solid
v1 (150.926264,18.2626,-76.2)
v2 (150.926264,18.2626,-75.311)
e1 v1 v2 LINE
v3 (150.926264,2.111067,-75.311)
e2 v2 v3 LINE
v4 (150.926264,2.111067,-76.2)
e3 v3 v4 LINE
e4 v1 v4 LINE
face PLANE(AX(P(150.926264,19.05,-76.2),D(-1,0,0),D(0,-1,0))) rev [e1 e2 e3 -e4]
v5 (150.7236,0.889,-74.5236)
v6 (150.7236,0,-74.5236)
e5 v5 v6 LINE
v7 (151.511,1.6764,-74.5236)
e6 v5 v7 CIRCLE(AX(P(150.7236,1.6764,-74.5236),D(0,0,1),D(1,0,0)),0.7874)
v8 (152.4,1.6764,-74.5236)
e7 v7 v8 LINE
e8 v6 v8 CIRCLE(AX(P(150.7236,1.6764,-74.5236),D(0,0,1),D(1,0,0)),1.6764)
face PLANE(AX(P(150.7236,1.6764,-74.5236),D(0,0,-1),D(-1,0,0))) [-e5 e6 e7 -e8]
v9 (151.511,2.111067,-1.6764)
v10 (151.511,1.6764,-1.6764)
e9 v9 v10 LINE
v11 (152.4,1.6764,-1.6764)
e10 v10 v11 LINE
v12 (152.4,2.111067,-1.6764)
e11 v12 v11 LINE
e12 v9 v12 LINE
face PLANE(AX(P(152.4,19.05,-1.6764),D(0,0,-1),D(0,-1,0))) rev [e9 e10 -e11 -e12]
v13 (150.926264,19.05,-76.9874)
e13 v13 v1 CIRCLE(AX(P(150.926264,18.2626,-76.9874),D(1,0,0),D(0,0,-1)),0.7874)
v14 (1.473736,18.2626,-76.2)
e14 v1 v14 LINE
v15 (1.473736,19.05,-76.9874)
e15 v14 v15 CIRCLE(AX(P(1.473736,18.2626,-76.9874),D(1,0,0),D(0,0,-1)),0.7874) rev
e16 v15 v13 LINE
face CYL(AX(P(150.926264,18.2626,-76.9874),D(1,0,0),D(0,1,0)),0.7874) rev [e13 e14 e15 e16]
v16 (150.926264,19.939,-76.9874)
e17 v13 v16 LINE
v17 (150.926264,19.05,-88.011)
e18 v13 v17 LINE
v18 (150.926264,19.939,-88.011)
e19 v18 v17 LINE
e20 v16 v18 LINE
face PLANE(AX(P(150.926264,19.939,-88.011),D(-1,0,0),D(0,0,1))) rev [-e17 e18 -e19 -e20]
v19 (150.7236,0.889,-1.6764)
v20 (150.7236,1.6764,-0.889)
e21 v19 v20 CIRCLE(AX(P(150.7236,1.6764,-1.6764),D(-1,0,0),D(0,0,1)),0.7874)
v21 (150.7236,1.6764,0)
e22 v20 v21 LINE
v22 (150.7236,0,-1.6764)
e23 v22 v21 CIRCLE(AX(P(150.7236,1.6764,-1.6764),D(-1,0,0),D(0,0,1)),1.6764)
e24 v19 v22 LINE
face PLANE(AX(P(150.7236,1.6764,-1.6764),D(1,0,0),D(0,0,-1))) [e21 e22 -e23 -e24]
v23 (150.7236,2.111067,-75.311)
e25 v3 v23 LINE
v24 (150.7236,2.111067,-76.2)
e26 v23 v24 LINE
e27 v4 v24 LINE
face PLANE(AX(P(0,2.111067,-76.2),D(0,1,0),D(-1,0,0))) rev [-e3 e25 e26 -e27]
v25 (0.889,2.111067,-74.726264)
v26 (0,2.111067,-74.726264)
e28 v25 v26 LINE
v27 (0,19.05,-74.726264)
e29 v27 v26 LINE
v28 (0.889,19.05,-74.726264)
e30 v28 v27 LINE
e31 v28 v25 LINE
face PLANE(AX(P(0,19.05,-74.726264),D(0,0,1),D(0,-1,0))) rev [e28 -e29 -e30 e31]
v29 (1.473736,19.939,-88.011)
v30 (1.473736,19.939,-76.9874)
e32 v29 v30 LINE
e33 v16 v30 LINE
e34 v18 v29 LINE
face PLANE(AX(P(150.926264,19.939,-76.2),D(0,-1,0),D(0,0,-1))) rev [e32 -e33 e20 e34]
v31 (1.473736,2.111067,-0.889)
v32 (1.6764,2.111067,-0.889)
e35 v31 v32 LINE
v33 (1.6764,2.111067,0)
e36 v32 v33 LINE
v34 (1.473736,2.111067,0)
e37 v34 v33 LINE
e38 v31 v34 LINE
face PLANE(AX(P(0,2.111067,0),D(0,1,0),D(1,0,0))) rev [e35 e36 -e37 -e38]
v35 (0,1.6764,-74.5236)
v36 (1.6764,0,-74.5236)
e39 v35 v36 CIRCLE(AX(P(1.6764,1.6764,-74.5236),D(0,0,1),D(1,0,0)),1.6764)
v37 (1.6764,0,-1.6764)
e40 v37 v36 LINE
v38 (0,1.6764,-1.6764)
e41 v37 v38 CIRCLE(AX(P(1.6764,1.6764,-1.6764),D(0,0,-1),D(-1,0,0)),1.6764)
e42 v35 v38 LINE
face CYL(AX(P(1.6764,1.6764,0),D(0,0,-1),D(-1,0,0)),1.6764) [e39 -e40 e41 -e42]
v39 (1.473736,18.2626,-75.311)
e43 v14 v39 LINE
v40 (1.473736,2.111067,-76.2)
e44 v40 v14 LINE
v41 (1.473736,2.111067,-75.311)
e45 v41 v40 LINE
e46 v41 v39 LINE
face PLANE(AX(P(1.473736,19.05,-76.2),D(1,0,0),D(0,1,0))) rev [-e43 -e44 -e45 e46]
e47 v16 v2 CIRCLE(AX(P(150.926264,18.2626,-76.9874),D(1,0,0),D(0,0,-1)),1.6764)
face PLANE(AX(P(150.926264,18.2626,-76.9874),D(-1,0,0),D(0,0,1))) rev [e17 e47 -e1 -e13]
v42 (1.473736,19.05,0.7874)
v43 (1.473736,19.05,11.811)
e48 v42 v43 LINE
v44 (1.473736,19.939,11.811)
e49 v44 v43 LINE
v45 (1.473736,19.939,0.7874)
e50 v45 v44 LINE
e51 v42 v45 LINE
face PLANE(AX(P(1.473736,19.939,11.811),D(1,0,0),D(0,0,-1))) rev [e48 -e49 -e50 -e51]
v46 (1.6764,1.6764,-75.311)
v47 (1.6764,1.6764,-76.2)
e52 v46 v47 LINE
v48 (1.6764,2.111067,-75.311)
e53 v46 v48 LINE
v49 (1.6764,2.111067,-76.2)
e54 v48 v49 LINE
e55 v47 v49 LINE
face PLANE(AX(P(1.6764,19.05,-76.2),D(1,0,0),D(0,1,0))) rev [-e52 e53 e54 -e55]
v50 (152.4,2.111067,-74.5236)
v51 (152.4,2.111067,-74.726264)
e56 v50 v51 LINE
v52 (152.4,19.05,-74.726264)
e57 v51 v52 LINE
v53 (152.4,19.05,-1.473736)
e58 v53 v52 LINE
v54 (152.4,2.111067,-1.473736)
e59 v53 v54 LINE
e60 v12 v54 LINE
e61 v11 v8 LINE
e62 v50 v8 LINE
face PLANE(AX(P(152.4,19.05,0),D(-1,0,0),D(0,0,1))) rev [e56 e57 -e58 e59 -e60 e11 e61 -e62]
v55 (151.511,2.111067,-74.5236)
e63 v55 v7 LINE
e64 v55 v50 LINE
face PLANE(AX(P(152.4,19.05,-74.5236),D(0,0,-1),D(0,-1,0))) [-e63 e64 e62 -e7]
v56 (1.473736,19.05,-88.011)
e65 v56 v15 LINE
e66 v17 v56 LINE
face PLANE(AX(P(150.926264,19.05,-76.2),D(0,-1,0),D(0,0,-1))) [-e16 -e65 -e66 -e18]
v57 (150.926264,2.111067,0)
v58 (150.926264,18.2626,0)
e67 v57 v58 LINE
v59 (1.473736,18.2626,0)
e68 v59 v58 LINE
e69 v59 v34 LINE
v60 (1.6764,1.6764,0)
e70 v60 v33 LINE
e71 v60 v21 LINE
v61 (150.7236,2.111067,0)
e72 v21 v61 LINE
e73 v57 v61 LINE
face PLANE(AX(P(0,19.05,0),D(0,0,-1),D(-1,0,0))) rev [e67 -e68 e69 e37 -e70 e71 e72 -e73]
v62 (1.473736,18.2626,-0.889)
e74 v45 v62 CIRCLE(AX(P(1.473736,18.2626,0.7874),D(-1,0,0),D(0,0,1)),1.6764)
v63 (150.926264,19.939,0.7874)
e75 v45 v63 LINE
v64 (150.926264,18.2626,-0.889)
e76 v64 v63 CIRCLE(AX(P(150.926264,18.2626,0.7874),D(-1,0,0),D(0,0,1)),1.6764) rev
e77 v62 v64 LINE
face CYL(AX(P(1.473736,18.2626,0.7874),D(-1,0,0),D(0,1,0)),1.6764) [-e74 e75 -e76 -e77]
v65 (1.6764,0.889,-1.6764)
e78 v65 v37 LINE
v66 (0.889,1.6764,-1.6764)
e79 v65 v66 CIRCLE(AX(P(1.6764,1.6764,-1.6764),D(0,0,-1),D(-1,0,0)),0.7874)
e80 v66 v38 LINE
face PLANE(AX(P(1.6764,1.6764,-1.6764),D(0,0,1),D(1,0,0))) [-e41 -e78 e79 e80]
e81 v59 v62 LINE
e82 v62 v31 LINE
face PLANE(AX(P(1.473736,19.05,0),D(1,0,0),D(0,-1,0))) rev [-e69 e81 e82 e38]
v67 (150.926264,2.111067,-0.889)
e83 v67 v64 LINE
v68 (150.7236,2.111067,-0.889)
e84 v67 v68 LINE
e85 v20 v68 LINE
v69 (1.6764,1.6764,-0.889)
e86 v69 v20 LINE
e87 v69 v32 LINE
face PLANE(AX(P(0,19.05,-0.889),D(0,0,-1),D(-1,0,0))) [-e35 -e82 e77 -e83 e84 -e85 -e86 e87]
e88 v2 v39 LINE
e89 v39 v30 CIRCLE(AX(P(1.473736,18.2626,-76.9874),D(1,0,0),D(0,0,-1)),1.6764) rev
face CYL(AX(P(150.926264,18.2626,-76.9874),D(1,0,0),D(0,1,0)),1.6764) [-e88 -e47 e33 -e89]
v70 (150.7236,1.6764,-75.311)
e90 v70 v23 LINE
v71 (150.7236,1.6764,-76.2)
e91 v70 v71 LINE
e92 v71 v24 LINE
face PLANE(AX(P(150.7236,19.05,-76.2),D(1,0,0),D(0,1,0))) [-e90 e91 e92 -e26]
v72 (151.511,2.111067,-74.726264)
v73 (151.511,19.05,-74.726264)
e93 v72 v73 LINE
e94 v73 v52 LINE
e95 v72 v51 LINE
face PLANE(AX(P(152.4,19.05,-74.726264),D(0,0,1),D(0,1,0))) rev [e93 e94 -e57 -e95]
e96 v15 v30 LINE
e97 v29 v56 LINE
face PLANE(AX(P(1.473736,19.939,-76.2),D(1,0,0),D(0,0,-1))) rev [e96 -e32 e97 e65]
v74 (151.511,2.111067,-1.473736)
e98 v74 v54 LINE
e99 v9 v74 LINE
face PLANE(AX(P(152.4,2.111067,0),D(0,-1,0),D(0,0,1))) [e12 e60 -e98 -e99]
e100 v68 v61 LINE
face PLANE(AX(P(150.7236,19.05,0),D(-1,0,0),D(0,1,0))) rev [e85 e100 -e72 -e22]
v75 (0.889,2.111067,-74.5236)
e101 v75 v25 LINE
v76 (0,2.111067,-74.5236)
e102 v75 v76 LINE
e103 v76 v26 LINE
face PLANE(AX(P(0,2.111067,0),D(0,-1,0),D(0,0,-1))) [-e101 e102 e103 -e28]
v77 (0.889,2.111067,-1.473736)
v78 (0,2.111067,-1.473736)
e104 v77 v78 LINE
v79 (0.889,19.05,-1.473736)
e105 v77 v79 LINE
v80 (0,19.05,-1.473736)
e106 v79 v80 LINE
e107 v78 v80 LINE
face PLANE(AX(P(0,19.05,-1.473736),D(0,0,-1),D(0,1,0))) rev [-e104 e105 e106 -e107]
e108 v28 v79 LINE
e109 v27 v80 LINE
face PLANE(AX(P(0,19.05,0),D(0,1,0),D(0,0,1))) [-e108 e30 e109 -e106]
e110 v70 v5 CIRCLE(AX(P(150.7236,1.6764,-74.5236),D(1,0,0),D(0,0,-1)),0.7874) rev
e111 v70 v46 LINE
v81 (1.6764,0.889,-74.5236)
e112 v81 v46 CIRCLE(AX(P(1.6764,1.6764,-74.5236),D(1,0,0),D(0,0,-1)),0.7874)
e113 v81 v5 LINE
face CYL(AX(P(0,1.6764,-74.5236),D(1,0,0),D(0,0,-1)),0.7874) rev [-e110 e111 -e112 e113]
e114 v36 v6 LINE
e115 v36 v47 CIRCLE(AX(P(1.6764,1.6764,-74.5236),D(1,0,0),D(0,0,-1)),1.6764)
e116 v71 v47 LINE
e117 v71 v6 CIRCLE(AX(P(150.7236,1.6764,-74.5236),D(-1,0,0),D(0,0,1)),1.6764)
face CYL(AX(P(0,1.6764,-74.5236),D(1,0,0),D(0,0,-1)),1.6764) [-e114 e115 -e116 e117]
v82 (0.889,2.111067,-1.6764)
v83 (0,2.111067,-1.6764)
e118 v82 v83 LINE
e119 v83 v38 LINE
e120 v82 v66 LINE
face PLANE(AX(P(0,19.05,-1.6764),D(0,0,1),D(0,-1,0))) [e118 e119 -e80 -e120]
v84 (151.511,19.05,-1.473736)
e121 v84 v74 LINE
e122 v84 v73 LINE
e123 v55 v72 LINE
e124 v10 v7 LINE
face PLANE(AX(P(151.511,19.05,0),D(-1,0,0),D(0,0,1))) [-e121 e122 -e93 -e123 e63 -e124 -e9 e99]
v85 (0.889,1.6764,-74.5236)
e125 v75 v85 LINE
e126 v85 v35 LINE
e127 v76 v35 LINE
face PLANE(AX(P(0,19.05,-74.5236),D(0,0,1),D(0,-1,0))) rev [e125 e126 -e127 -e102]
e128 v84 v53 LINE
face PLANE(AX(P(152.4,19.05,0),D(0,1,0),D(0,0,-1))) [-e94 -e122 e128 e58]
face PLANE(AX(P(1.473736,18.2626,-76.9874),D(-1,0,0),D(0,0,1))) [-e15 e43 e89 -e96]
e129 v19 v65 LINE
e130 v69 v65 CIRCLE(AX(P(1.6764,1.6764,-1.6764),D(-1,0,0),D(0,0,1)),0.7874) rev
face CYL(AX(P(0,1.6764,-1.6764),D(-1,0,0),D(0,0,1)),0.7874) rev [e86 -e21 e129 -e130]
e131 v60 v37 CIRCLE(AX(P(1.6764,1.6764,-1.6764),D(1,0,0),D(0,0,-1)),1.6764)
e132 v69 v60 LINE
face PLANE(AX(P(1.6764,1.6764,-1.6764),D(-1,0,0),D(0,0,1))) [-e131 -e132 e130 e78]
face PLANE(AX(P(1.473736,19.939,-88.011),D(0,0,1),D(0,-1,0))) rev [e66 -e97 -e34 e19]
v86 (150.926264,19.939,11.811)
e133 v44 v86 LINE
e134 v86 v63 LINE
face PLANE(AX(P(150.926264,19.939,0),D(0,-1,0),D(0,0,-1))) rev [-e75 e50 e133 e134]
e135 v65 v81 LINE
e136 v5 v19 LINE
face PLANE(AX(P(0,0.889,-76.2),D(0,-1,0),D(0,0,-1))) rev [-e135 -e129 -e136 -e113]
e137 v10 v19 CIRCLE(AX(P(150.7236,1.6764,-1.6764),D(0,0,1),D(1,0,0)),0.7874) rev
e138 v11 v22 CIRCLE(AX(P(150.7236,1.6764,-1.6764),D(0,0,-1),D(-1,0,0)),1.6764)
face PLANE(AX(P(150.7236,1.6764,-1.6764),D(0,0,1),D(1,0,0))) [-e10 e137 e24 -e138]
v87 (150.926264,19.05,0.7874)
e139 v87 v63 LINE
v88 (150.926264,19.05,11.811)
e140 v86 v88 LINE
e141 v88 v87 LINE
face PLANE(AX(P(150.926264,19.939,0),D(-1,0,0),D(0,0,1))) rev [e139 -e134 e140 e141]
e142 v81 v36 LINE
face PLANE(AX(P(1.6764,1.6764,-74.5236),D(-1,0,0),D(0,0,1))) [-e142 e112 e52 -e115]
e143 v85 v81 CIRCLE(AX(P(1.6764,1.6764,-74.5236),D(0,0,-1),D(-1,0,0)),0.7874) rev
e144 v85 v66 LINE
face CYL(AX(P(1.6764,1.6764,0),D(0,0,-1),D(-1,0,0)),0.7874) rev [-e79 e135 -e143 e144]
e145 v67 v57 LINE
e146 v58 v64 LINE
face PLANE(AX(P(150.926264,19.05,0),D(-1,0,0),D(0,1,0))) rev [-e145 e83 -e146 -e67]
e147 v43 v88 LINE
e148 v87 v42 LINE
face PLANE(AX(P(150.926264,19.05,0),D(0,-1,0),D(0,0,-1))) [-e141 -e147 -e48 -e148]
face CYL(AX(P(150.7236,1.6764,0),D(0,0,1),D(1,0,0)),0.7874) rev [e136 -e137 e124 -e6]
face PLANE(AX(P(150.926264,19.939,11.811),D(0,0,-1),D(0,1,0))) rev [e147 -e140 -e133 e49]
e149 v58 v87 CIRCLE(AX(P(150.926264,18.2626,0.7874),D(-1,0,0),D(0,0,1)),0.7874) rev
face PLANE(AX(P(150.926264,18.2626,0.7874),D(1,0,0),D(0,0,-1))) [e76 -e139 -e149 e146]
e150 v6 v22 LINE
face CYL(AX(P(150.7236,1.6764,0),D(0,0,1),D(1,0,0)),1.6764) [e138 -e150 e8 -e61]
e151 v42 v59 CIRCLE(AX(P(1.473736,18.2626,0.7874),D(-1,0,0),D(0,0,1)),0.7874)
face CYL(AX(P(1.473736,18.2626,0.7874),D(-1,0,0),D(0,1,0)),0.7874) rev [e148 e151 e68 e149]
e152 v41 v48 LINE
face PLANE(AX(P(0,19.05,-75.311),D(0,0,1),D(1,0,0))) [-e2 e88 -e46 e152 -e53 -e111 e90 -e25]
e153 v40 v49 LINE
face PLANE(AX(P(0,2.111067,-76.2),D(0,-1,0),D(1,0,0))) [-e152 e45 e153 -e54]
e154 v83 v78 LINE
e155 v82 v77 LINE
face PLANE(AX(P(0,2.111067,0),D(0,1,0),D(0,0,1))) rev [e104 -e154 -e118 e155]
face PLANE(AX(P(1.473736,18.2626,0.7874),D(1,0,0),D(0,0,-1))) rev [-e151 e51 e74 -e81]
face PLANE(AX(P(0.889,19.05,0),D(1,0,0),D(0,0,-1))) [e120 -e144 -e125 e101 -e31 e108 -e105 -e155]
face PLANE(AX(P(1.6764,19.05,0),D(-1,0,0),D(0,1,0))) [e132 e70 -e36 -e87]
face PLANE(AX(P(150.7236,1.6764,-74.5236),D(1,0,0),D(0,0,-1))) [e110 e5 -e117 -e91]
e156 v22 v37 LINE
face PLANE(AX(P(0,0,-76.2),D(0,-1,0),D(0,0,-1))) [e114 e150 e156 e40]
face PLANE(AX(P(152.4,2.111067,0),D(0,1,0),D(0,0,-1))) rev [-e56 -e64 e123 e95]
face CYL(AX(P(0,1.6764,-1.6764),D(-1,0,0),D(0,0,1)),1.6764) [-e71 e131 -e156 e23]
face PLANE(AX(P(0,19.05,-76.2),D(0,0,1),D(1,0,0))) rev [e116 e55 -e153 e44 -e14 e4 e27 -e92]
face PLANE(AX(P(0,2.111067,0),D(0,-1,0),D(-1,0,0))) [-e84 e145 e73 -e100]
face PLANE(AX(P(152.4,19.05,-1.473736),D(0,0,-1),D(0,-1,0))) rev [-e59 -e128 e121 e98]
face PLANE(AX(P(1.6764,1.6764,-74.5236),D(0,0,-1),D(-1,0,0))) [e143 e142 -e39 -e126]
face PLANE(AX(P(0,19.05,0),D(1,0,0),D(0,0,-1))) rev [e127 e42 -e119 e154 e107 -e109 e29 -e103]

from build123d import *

# Parameters (mm, degrees)
SKETCH1_W                      = 152.4
SKETCH1_H                      = 76.2
BOSS_EXTRUDE1_DEPTH            = 19.05
CONVERT_SOLID1_START           = -74.5236
CONVERT_SOLID1_DEPTH           = 72.8472
CONVERT_SOLID1_START_2         = -77
CONVERT_SOLID1_2_DEPTH         = 2.273736392
CONVERT_SOLID1_START_3         = -1.473736392
CONVERT_SOLID1_3_DEPTH         = 2.473736392
CONVERT_SOLID1_START_4         = -74.726263608
CONVERT_SOLID1_4_DEPTH         = 73.252527216
CONVERT_SOLID1_5_DEPTH         = 0.202663608
CONVERT_SOLID1_START_5         = -1.6764
CONVERT_SOLID1_6_DEPTH         = 0.202663608
CONVERT_SOLID1_START_6         = 1.473736392
CONVERT_SOLID1_7_DEPTH         = 149.452527216
EDGE_FLANGE1_STRIP_W           = 5.1308
EDGE_FLANGE1_STRIP_H           = 0.889
EDGE_FLANGE1_STRIP_CUT_DEPTH   = 149.452527217
EDGE_FLANGE1_STRIP_2_W         = 5.1308
EDGE_FLANGE1_STRIP_2_H         = 0.889
EDGE_FLANGE1_STRIP_CUT_2_DEPTH = 149.452527217
EDGE_FLANGE1_DEPTH             = 149.452527217
EDGE_FLANGE1_BEND_DEPTH        = 149.452527217


with BuildPart() as part:
    # Sketch1 → Boss-Extrude1 (new body)
    with BuildSketch(Plane(origin=(0, 0, 0), x_dir=(1, 0, 0), z_dir=(0, 1, 0))):
        with Locations((76.2, 38.1)):
            Rectangle(SKETCH1_W, SKETCH1_H)
    extrude(amount=BOSS_EXTRUDE1_DEPTH)

    # Convert-Solid1: read off the stored shape, not the designer's step
    # Convert-Solid1 outline → Convert-Solid1 (cut)
    with BuildSketch(Plane.XY.offset(CONVERT_SOLID1_START)):
        with BuildLine():
            Line((151.511, 19.05), (0.889, 19.05))
            Line((0.889, 19.05), (0.889, 1.6764))
            ThreePointArc((0.889, 1.6764), (1.11962412, 1.11962412), (1.6764, 0.889))
            Line((1.6764, 0.889), (150.7236, 0.889))
            ThreePointArc((150.7236, 0.889), (151.28037588, 1.11962412), (151.511, 1.6764))
            Line((151.511, 1.6764), (151.511, 19.05))
        make_face()
        with BuildLine():
            ThreePointArc((152.4, 1.6764), (151.908993808, 0.491006192), (150.7236, 0))
            Line((150.7236, 0), (152.4, 0))
            Line((152.4, 0), (152.4, 1.6764))
        make_face()
        with BuildLine():
            Line((0, 0), (1.6764, 0))
            ThreePointArc((1.6764, 0), (0.491006192, 0.491006192), (0, 1.6764))
            Line((0, 1.6764), (0, 0))
        make_face()
    extrude(amount=CONVERT_SOLID1_DEPTH, mode=Mode.SUBTRACT)

    # Convert-Solid1 2 outline → Convert-Solid1 2 (cut)
    with BuildSketch(Plane.XY.offset(CONVERT_SOLID1_START_2)):
        Polygon((150.926263608, 2.11106664), (150.7236, 2.11106664), (150.7236, 0), (152.4, 0), (152.4, 19.05), (150.926263608, 19.05), align=None)
        Polygon((1.473736392, 19.05), (0, 19.05), (0, 0), (1.6764, 0), (1.6764, 2.11106664), (1.473736392, 2.11106664), align=None)
    extrude(amount=CONVERT_SOLID1_2_DEPTH, mode=Mode.SUBTRACT)

    # Convert-Solid1 3 outline → Convert-Solid1 3 (cut)
    with BuildSketch(Plane.XY.offset(CONVERT_SOLID1_START_3)):
        Polygon((150.926263608, 2.11106664), (150.7236, 2.11106664), (150.7236, 0), (152.4, 0), (152.4, 19.05), (150.926263608, 19.05), align=None)
        Polygon((1.473736392, 19.05), (0, 19.05), (0, 0), (1.6764, 0), (1.6764, 2.11106664), (1.473736392, 2.11106664), align=None)
    extrude(amount=CONVERT_SOLID1_3_DEPTH, mode=Mode.SUBTRACT)

    # Convert-Solid1 4 outline → Convert-Solid1 4 (cut)
    with BuildSketch(Plane.XY.offset(CONVERT_SOLID1_START_4)):
        with BuildLine():
            Line((150.926263608, 2.11106664), (150.7236, 2.11106664))
            Line((150.7236, 2.11106664), (150.7236, 0.889))
            ThreePointArc((150.7236, 0.889), (151.28037588, 1.11962412), (151.511, 1.6764))
            Line((151.511, 1.6764), (151.511, 19.05))
            Line((151.511, 19.05), (150.926263608, 19.05))
            Line((150.926263608, 19.05), (150.926263608, 2.11106664))
        make_face()
        with BuildLine():
            ThreePointArc((152.4, 1.6764), (151.908993808, 0.491006192), (150.7236, 0))
            Line((150.7236, 0), (152.4, 0))
            Line((152.4, 0), (152.4, 1.6764))
        make_face()
        with BuildLine():
            ThreePointArc((0.889, 1.6764), (1.11962412, 1.11962412), (1.6764, 0.889))
            Line((1.6764, 0.889), (1.6764, 2.11106664))
            Line((1.6764, 2.11106664), (1.473736392, 2.11106664))
            Line((1.473736392, 2.11106664), (1.473736392, 19.05))
            Line((1.473736392, 19.05), (0.889, 19.05))
            Line((0.889, 19.05), (0.889, 1.6764))
        make_face()
        with BuildLine():
            Line((0, 0), (1.6764, 0))
            ThreePointArc((1.6764, 0), (0.491006192, 0.491006192), (0, 1.6764))
            Line((0, 1.6764), (0, 0))
        make_face()
    extrude(amount=CONVERT_SOLID1_4_DEPTH, mode=Mode.SUBTRACT)

    # Convert-Solid1 5 outline → Convert-Solid1 5 (cut)
    with BuildSketch(Plane.XY.offset(CONVERT_SOLID1_START_4)):
        with BuildLine():
            ThreePointArc((151.511, 1.6764), (151.28037588, 1.11962412), (150.7236, 0.889))
            Line((150.7236, 0.889), (150.7236, 0))
            ThreePointArc((150.7236, 0), (151.908993808, 0.491006192), (152.4, 1.6764))
            Line((152.4, 1.6764), (152.4, 2.11106664))
            Line((152.4, 2.11106664), (151.511, 2.11106664))
            Line((151.511, 2.11106664), (151.511, 1.6764))
        make_face()
        with BuildLine():
            Line((1.6764, 0), (1.6764, 0.889))
            ThreePointArc((1.6764, 0.889), (1.11962412, 1.11962412), (0.889, 1.6764))
            Line((0.889, 1.6764), (0.889, 2.11106664))
            Line((0.889, 2.11106664), (0, 2.11106664))
            Line((0, 2.11106664), (0, 1.6764))
            ThreePointArc((0, 1.6764), (0.491006192, 0.491006192), (1.6764, 0))
        make_face()
    extrude(amount=CONVERT_SOLID1_5_DEPTH, mode=Mode.SUBTRACT)

    # Convert-Solid1 6 outline → Convert-Solid1 6 (cut)
    with BuildSketch(Plane.XY.offset(CONVERT_SOLID1_START_5)):
        with BuildLine():
            ThreePointArc((151.511, 1.6764), (151.28037588, 1.11962412), (150.7236, 0.889))
            Line((150.7236, 0.889), (150.7236, 0))
            ThreePointArc((150.7236, 0), (151.908993808, 0.491006192), (152.4, 1.6764))
            Line((152.4, 1.6764), (152.4, 2.11106664))
            Line((152.4, 2.11106664), (151.511, 2.11106664))
            Line((151.511, 2.11106664), (151.511, 1.6764))
        make_face()
        with BuildLine():
            Line((1.6764, 0), (1.6764, 0.889))
            ThreePointArc((1.6764, 0.889), (1.11962412, 1.11962412), (0.889, 1.6764))
            Line((0.889, 1.6764), (0.889, 2.11106664))
            Line((0.889, 2.11106664), (0, 2.11106664))
            Line((0, 2.11106664), (0, 1.6764))
            ThreePointArc((0, 1.6764), (0.491006192, 0.491006192), (1.6764, 0))
        make_face()
    extrude(amount=CONVERT_SOLID1_6_DEPTH, mode=Mode.SUBTRACT)

    # Convert-Solid1 7 outline → Convert-Solid1 7 (cut)
    with BuildSketch(Plane.YZ.offset(CONVERT_SOLID1_START_6)):
        with BuildLine():
            Line((0, 0), (0, -1.6764))
            ThreePointArc((0, -1.6764), (0.491006192, -0.491006192), (1.6764, 0))
            Line((1.6764, 0), (0, 0))
        make_face()
        with BuildLine():
            ThreePointArc((1.6764, -76.2), (0.491006192, -75.708993808), (0, -74.5236))
            Line((0, -74.5236), (0, -76.2))
            Line((0, -76.2), (1.6764, -76.2))
        make_face()
        with BuildLine():
            Line((19.05, -74.5236), (0.889, -74.5236))
            ThreePointArc((0.889, -74.5236), (1.11962412, -75.08037588), (1.6764, -75.311))
            Line((1.6764, -75.311), (19.05, -75.311))
            Line((19.05, -75.311), (19.05, -74.5236))
        make_face()
        with BuildLine():
            Line((0.889, -1.6764), (19.05, -1.6764))
            Line((19.05, -1.6764), (19.05, -0.889))
            Line((19.05, -0.889), (1.6764, -0.889))
            ThreePointArc((1.6764, -0.889), (1.11962412, -1.11962412), (0.889, -1.6764))
        make_face()
    extrude(amount=CONVERT_SOLID1_7_DEPTH, mode=Mode.SUBTRACT)

    # Edge-Flange1: sheet metal written as solids
    # Edge-Flange1 strip (on a plane across the edge) → Edge-Flange1 strip cut (cut)
    with BuildSketch(Plane(origin=(150.926263608, 19.05, 0), x_dir=(0, -1, 0), z_dir=(-1, 0, 0))):
        with Locations((-1.778, -0.4445)):
            Rectangle(EDGE_FLANGE1_STRIP_W, EDGE_FLANGE1_STRIP_H)
    extrude(amount=EDGE_FLANGE1_STRIP_CUT_DEPTH, mode=Mode.SUBTRACT)

    # Edge-Flange1 strip 2 (on a plane across the edge) → Edge-Flange1 strip cut 2 (cut)
    with BuildSketch(Plane(origin=(1.473736392, 19.05, -76.2), x_dir=(0, -1, 0), z_dir=(1, 0, 0))):
        with Locations((-1.778, -0.4445)):
            Rectangle(EDGE_FLANGE1_STRIP_2_W, EDGE_FLANGE1_STRIP_2_H)
    extrude(amount=EDGE_FLANGE1_STRIP_CUT_2_DEPTH, mode=Mode.SUBTRACT)

    # Edge-Flange1 section (on a plane across the edge) → Edge-Flange1 (add)
    with BuildSketch(Plane(origin=(150.926263608, 19.05, 0), x_dir=(0, -1, 0), z_dir=(-1, 0, 0))):
        with BuildLine():
            Line((-0.889, 0.7874), (-0.889, 11.811))
            Line((-0.889, 11.811), (0, 11.811))
            Line((0, 11.811), (0, 0.7874))
            ThreePointArc((0, 0.7874), (0.23062412, 0.23062412), (0.7874, 0))
            Line((0.7874, 0), (0.7874, -0.889))
            ThreePointArc((0.7874, -0.889), (-0.397993808, -0.397993808), (-0.889, 0.7874))
        make_face()
    extrude(amount=EDGE_FLANGE1_DEPTH)

    # Edge-Flange1 section 2 (on a plane across the edge) → Edge-Flange1 bend (add)
    with BuildSketch(Plane(origin=(1.473736392, 19.05, -76.2), x_dir=(0, -1, 0), z_dir=(1, 0, 0))):
        with BuildLine():
            Line((-0.889, 0.7874), (-0.889, 11.811))
            Line((-0.889, 11.811), (0, 11.811))
            Line((0, 11.811), (0, 0.7874))
            ThreePointArc((0, 0.7874), (0.23062412, 0.23062412), (0.7874, 0))
            Line((0.7874, 0), (0.7874, -0.889))
            ThreePointArc((0.7874, -0.889), (-0.397993808, -0.397993808), (-0.889, 0.7874))
        make_face()
    extrude(amount=EDGE_FLANGE1_BEND_DEPTH)


solid = part.part
